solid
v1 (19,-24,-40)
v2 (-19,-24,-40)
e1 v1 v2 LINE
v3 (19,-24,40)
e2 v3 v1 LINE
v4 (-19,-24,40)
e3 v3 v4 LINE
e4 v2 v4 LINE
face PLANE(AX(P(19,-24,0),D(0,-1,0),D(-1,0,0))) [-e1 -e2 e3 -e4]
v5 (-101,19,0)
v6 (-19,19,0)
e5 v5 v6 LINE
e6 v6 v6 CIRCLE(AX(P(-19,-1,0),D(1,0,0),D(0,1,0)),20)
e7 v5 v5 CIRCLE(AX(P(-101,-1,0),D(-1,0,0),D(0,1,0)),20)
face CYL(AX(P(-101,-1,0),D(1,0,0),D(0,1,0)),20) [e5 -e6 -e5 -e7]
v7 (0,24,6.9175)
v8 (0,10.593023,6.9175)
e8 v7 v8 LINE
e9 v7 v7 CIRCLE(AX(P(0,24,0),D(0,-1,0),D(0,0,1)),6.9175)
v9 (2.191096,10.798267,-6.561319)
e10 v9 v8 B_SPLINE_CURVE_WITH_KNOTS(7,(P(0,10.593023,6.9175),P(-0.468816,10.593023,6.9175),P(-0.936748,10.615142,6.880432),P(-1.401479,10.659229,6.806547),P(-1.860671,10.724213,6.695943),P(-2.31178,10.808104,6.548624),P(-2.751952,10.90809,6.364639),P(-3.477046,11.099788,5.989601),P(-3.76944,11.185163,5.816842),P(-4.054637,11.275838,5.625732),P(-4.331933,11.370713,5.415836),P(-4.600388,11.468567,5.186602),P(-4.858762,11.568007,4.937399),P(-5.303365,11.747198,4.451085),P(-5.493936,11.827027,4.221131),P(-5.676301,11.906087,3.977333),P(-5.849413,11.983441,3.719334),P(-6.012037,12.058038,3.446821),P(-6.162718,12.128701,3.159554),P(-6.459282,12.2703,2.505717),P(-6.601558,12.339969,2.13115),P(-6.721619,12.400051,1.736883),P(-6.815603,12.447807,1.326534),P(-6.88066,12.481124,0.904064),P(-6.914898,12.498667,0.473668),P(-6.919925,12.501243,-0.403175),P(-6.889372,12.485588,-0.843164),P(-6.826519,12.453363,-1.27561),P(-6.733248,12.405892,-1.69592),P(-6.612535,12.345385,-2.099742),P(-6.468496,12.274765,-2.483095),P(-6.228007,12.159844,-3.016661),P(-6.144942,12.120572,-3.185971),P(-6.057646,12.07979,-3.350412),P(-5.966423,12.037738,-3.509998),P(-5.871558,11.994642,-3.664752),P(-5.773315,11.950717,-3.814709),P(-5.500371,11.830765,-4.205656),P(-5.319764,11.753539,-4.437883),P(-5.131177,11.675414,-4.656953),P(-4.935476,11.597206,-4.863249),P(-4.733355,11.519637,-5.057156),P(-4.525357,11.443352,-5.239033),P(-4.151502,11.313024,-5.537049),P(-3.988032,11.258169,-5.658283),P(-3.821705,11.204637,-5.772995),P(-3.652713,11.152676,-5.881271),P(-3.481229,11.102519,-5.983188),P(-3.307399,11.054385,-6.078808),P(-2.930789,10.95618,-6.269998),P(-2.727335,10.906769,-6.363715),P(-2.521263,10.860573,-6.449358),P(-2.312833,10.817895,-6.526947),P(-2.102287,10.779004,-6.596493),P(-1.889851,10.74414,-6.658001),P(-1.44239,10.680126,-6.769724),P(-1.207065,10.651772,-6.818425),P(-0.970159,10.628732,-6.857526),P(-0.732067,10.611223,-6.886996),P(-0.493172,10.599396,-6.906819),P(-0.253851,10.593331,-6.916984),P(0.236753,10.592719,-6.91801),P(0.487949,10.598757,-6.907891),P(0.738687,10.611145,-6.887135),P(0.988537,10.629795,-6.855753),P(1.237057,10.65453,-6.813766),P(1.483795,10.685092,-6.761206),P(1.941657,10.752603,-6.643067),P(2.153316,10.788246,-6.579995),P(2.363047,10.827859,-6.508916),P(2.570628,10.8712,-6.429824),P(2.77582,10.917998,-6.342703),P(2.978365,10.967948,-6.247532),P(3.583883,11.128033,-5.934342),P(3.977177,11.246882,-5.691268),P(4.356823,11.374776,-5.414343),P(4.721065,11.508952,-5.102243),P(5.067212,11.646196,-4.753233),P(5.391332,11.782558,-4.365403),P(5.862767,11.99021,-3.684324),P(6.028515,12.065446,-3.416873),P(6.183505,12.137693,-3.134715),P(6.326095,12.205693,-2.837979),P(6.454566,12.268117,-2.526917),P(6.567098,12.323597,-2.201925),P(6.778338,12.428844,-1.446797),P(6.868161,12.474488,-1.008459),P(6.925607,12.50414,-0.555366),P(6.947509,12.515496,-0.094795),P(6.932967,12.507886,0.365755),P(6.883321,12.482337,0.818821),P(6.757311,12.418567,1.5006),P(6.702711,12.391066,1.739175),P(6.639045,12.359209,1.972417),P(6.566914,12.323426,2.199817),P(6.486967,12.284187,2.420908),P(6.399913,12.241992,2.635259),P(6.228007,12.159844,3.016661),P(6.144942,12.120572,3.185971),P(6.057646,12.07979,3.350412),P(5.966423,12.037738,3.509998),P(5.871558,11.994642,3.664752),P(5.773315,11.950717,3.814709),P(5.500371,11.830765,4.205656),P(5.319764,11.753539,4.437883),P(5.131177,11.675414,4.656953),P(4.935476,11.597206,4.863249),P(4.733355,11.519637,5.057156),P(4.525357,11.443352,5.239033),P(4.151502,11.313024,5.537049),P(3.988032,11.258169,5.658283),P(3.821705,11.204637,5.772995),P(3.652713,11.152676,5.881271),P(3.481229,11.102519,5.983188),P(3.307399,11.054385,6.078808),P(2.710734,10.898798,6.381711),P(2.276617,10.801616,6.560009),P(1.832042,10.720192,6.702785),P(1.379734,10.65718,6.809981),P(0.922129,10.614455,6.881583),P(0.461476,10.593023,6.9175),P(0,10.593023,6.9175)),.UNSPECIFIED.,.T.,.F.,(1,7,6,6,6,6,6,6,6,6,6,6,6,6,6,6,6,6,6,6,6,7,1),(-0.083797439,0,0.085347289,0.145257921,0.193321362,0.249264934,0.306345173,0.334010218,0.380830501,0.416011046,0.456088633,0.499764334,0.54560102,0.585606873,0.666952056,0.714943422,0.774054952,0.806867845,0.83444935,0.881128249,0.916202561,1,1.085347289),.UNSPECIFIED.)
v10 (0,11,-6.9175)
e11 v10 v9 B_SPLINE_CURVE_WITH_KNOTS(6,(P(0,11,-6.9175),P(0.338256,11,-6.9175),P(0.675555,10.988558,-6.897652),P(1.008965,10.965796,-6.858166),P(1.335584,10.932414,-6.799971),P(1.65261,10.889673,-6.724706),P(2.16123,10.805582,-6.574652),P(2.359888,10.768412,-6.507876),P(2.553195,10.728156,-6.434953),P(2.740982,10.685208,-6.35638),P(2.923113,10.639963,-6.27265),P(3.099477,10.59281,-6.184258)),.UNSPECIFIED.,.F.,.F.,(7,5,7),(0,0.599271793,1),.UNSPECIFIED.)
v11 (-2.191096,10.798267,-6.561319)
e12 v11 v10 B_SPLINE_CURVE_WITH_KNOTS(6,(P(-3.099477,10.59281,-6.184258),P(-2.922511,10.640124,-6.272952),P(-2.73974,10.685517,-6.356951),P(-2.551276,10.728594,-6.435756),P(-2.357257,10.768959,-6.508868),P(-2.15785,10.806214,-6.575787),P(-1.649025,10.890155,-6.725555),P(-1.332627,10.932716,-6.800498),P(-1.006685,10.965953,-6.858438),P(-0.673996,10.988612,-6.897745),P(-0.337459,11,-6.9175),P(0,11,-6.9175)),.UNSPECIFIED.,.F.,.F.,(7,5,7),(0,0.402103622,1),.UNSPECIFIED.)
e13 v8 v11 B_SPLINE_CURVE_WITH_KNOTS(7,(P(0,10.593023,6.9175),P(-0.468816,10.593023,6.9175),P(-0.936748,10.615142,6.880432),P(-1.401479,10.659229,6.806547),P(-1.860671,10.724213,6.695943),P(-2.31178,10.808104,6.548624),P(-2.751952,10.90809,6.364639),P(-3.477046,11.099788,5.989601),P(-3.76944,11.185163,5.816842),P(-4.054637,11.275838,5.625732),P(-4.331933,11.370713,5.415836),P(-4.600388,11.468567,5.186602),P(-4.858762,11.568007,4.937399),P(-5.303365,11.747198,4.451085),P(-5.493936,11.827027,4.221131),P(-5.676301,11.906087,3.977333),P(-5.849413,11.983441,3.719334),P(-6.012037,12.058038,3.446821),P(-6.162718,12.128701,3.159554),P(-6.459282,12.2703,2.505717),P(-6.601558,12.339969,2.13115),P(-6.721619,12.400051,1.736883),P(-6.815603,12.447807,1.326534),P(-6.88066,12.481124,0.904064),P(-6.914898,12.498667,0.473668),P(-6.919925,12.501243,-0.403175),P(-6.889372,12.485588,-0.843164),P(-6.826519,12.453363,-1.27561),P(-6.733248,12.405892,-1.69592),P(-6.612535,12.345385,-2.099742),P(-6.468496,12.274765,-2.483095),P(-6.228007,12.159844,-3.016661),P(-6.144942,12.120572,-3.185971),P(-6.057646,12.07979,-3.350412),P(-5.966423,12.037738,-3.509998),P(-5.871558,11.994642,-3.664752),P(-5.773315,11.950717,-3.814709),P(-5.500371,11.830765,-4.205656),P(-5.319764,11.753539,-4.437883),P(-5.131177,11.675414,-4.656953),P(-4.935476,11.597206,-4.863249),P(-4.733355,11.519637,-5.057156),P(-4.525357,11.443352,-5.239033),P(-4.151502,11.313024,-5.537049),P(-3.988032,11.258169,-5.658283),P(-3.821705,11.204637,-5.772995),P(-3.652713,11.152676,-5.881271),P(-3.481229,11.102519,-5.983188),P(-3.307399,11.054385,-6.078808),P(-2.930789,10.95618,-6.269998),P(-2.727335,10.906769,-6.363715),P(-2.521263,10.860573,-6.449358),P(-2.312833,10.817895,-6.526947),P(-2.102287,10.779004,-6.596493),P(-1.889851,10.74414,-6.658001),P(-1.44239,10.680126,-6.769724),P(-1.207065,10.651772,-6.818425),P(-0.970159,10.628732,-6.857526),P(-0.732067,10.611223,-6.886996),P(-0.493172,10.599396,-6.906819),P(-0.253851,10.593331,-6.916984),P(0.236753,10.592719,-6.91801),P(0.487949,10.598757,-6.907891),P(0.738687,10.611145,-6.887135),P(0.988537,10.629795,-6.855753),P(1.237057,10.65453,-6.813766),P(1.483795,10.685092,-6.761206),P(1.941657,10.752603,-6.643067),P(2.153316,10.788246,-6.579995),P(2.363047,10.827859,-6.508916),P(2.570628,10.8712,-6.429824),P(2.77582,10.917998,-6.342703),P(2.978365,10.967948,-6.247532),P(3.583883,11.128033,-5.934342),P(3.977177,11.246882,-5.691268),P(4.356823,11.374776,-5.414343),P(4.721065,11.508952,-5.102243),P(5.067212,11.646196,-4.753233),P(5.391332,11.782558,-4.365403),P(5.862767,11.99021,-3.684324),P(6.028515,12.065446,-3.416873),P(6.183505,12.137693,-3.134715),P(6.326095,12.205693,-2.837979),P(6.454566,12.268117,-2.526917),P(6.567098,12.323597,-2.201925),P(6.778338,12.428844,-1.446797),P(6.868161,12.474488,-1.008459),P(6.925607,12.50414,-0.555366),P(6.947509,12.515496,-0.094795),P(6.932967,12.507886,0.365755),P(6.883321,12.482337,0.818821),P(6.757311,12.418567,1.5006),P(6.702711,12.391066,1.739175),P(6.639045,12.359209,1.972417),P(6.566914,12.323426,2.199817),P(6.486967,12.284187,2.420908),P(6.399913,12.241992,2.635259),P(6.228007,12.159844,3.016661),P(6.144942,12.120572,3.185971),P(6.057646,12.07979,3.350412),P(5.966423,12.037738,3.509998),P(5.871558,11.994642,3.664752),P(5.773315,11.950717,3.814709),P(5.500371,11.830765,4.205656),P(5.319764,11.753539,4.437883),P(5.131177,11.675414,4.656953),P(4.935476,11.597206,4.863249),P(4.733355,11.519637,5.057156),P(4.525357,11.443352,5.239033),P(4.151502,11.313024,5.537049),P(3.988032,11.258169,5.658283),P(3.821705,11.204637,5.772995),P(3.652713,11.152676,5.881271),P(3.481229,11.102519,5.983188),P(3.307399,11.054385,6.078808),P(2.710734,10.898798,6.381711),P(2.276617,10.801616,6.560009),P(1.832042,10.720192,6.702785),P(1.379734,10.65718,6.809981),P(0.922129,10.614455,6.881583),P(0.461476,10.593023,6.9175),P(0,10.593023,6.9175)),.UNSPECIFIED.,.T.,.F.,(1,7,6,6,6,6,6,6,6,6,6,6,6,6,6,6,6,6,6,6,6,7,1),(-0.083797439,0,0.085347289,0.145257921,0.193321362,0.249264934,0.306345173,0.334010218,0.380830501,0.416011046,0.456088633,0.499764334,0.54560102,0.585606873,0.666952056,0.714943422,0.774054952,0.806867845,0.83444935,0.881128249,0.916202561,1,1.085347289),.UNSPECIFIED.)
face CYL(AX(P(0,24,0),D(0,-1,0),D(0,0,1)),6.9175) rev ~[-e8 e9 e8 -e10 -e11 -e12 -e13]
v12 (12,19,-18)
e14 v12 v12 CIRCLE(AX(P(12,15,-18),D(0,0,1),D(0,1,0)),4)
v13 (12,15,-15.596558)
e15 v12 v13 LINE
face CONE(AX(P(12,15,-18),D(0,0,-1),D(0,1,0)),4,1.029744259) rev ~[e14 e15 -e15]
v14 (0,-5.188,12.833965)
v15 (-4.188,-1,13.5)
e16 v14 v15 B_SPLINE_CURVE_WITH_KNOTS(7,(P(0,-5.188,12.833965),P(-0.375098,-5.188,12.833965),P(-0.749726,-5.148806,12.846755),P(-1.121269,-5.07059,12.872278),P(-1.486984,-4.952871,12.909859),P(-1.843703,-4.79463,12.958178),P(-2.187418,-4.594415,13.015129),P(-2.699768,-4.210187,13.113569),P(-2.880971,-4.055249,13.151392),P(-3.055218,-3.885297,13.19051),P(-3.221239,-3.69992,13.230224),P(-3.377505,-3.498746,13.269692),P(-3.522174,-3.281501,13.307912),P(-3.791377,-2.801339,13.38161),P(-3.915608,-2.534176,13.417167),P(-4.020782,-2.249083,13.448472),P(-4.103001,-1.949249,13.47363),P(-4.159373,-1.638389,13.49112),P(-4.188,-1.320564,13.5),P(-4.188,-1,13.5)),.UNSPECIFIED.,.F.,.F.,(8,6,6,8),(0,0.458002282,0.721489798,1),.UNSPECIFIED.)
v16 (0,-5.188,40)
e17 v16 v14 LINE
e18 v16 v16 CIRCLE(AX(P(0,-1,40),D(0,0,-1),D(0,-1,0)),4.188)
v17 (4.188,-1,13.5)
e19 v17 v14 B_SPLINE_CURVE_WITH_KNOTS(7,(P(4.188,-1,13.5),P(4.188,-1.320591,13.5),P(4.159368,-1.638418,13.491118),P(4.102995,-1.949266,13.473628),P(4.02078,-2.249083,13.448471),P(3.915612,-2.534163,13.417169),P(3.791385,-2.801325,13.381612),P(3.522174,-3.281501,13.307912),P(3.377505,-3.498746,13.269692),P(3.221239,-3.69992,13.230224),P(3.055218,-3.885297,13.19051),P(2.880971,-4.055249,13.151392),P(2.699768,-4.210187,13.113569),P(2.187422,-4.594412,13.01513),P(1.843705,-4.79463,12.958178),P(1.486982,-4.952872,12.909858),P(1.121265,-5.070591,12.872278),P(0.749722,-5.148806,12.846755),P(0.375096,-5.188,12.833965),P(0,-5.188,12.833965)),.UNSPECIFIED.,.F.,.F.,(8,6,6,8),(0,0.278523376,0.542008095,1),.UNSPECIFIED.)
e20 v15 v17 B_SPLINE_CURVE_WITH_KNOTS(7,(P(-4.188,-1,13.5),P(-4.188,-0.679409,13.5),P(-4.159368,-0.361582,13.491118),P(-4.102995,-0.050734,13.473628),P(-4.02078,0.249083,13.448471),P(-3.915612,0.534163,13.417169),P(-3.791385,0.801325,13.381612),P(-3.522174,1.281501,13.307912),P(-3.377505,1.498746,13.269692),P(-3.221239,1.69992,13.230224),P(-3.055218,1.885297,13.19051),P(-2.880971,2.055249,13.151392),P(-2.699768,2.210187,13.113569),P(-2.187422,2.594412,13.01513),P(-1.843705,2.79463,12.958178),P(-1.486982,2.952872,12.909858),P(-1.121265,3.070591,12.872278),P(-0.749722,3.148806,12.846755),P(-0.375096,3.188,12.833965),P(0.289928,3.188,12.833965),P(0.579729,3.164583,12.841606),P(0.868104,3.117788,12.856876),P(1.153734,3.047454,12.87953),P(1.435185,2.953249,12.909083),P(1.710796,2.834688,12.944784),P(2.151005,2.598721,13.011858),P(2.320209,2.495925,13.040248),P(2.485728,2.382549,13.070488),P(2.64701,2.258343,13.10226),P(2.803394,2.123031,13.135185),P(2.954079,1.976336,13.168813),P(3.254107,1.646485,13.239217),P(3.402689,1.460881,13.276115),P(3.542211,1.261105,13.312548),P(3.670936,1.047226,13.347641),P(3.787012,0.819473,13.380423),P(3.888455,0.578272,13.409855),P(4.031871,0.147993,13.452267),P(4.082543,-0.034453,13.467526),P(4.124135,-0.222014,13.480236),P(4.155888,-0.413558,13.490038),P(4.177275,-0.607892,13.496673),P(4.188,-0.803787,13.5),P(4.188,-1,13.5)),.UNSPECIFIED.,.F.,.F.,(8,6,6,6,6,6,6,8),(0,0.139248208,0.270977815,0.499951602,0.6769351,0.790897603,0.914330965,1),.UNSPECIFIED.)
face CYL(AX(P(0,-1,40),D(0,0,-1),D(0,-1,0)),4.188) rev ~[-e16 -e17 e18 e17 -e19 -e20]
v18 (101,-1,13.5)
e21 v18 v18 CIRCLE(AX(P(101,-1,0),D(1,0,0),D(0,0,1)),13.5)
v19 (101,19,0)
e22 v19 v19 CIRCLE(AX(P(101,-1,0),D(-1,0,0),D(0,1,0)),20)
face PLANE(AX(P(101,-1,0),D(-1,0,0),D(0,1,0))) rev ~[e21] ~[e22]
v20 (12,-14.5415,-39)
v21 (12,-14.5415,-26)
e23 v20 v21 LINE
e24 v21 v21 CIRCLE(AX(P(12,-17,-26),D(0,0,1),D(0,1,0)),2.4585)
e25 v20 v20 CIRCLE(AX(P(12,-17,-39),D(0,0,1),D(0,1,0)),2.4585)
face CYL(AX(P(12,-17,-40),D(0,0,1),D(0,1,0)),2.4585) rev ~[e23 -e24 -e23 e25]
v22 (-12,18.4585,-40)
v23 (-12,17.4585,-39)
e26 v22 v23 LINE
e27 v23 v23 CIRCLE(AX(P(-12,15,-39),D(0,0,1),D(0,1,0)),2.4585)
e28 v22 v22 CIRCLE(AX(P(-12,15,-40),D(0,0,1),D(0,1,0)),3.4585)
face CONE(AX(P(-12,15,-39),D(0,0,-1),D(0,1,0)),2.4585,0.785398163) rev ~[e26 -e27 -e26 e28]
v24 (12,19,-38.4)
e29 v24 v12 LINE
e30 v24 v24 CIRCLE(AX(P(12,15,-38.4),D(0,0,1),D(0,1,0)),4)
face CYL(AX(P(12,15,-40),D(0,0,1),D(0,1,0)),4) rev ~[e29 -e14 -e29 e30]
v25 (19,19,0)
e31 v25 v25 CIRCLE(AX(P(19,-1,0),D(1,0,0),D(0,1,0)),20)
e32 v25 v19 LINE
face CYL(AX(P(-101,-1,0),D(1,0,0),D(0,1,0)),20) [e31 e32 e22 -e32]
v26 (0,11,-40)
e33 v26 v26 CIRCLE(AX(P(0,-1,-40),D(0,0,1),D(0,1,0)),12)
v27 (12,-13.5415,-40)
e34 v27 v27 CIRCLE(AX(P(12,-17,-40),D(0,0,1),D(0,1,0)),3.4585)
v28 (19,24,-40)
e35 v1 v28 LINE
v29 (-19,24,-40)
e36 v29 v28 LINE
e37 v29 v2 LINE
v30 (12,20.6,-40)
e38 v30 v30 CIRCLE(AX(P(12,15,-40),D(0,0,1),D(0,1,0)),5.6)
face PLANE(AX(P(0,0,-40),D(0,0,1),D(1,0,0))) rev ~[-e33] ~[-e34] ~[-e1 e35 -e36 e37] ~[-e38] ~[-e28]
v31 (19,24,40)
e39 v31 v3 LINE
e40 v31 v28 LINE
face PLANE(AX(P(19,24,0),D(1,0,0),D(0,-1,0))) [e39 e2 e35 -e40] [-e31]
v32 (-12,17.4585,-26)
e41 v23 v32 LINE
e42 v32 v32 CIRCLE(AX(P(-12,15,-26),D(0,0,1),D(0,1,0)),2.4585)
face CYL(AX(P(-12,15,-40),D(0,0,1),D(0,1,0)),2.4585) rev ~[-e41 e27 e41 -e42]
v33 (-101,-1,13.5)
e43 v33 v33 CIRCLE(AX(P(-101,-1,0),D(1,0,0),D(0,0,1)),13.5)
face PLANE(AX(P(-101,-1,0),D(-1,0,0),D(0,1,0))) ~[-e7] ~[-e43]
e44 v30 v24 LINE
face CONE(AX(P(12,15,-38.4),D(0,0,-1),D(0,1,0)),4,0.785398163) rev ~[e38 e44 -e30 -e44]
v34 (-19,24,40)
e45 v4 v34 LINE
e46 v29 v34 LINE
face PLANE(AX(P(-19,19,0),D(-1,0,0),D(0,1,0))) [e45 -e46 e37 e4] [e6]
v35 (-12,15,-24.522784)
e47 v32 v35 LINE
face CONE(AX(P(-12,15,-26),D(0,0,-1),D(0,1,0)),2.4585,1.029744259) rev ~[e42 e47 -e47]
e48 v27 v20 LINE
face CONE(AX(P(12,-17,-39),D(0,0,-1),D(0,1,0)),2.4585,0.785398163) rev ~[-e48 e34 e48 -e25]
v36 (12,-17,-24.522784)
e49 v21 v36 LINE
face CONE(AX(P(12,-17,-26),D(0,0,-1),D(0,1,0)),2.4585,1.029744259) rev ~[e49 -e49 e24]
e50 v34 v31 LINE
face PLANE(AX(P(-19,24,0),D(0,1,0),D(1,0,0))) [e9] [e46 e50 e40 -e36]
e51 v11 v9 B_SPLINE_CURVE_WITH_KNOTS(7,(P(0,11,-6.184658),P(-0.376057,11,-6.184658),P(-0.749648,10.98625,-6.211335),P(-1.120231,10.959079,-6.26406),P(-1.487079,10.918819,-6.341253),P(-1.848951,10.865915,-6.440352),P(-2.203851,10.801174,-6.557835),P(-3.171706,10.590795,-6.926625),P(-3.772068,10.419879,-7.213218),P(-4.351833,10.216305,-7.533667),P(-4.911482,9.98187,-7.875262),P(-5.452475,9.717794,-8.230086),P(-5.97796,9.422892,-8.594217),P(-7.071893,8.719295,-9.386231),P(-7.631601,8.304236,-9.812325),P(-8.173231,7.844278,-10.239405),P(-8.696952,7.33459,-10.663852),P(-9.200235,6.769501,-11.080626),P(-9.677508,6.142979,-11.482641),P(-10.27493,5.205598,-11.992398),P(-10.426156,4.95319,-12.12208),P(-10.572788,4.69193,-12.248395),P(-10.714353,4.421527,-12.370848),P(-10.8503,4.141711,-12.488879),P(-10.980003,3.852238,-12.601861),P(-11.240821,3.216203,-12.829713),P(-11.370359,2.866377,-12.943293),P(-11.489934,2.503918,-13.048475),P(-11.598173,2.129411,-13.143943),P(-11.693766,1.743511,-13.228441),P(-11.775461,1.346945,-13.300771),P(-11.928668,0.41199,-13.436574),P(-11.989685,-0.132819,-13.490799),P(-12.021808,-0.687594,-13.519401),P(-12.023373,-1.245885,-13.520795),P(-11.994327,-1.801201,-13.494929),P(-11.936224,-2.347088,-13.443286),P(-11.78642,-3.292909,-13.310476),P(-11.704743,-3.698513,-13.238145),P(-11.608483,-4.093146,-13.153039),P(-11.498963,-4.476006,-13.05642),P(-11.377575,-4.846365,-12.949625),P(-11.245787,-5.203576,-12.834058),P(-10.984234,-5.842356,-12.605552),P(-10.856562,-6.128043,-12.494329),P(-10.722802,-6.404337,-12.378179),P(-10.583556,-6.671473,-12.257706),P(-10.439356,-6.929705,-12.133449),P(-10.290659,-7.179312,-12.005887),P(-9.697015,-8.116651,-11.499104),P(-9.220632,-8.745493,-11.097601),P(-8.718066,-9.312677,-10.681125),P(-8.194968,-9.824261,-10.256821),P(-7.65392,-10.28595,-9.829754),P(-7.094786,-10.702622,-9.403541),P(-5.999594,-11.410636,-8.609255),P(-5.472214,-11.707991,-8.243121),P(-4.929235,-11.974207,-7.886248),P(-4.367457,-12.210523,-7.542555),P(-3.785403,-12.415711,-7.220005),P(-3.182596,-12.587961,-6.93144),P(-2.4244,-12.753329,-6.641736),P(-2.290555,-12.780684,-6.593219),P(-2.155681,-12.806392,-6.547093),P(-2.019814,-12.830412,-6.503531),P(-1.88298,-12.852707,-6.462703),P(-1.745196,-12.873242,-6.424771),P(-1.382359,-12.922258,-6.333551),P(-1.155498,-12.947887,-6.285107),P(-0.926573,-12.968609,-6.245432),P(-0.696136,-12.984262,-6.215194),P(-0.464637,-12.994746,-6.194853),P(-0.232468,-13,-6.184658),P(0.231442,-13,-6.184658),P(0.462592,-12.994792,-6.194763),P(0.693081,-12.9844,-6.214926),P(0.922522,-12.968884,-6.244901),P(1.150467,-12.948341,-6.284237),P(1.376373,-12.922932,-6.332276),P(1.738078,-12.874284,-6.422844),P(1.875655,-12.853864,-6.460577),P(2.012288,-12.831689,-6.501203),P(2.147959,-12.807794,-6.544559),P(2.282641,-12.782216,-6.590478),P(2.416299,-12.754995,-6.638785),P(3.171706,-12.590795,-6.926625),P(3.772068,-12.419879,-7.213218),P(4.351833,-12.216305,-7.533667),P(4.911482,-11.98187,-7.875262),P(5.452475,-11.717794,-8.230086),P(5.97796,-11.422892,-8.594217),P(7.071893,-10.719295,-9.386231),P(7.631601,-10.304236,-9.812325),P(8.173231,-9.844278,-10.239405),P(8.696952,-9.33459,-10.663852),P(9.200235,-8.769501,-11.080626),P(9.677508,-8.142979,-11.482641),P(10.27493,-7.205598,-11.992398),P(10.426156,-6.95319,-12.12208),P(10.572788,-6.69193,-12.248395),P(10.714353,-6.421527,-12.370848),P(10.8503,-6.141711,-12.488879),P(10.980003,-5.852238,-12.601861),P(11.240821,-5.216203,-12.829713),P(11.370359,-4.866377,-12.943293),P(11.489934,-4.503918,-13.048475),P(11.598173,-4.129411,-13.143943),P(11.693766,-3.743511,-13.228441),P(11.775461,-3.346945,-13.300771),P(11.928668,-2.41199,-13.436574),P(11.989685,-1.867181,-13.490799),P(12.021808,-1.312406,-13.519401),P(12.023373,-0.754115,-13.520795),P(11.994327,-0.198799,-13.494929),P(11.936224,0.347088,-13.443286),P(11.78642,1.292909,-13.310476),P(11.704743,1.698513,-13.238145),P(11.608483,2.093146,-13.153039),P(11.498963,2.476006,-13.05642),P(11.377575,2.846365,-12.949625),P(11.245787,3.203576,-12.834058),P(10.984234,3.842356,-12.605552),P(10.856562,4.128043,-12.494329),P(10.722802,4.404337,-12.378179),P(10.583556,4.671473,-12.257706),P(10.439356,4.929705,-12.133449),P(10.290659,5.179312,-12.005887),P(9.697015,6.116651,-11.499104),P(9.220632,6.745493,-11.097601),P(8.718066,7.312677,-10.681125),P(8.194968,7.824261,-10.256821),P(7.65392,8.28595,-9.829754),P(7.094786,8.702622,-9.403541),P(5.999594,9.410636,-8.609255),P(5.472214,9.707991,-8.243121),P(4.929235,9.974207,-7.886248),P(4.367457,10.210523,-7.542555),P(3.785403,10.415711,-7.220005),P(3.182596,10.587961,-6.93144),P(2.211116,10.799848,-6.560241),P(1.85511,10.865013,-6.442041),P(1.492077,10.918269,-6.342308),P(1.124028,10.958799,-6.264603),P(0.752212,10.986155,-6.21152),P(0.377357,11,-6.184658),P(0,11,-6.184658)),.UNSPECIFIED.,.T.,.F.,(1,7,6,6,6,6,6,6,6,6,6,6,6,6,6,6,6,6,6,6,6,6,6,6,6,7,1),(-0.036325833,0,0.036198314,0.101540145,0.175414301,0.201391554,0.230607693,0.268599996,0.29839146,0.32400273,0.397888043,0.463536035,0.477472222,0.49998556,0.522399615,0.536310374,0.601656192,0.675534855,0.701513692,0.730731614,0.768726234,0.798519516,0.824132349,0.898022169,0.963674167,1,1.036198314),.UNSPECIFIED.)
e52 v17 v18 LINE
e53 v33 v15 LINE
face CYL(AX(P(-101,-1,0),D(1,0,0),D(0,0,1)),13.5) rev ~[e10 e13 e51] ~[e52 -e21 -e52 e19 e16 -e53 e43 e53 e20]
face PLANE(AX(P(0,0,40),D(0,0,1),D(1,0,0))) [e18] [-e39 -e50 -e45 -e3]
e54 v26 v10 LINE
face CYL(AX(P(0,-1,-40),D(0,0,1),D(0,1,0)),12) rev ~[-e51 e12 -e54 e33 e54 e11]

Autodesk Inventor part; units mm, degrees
ref_plane "YZ Plane" through (0, 0, 0) normal (1, 0, 0) x (0, 1, 0)
ref_plane "XZ Plane" through (0, 0, 0) normal (0, 1, 0) x (-1, 0, 0)
ref_plane "XY Plane" through (0, 0, 0) normal (0, 0, 1) x (1, 0, 0)
sketch "Эскиз1" plane through (0, 0, 0) normal (0, 0, 1) x (1, 0, 0)
  line L0 (-19, 24) -> (19, 24)
  line L1 (19, 24) -> (19, -24)
  line L2 (19, -24) -> (-19, -24)
  line L3 (-19, -24) -> (-19, 24)
  line L4 (-19, 24) -> (19, -24) construction
  line L5 (19, 24) -> (-19, -24) construction
  line L6 (-101, 19) -> (101, 19)
  line L7 (101, 19) -> (101, -1)
  line L8 (101, -1) -> (-101, -1)
  line L9 (-101, -1) -> (-101, 19)
  point P0 (0, 0)
  point P1 (0, 0)
  point P2 (0, -1)
  point P3 (0, 0)
  dimension "d1" = 38
  dimension "d2" = 48
  dimension "d3" = 202
  dimension "d4" = 40
  dimension "d75" = 25
extrude "Выдавливание1" add sketch "Эскиз1" along normal mid plane 80 contours L0 L1 L6 L3 | L6 L1 L8 L3 | L8 L1 L2 L3
revolve "Вращение1" add sketch "Эскиз1" angle 360 about axis through (101, -1, 0) along (-1, 0, 0) contours L6 L1 L8 L3 | L3 L8 L9 L6 | L6 L7 L8 L1
hole "Отверстие1" at (-101, -1, 0) direction (1, 0, 0) diameter 27 end through all
hole "Отверстие2" at (0, -1, -40) direction (0, 0, 1) diameter 24 end up to surface
hole "Отверстие3" at (0, -1, 40) direction (0, 0, -1) diameter 8.376 end up to surface thread size "M10x1.5" class "6H" standard "ISO Metric profile"
hole "Отверстие4" at (0, 24, 0) direction (0, -1, 0) diameter 13.835 end up to surface thread size "M16x2" class "6H" standard "ISO Metric profile"
sketch "Эскиз2" plane through (0, 0, -40) normal (0, 0, -1) x (-1, 0, 0)
  circle A0 centre (0, -1) radius 12 projected
  point P0 (12, 15)
  point P1 (-12, -17)
  point P2 (-12, 15)
  dimension "d71" = 12
  dimension "d73" = 16
  dimension "d76" = 32
  dimension "d77" = 12
hole "Отверстие5" at (-12, 15, -40) at (12, -17, -40) direction (0, 0, 1) diameter 4.917 depth 14 tip angle 118 thread size "M6x1" class "6H" standard "ISO Metric profile"
hole "Отверстие6" at (12, 15, -40) direction (0, 0, 1) diameter 8 depth 22 tip angle 118
chamfer "Фаска1" distance 1 angle 45 2 edges at (-12, 12.5415, -40) (12, -19.4585, -40)
chamfer "Фаска2" distance 1.6 angle 45 1 edges at (12, 11, -40)
properties part number "Колонка"
